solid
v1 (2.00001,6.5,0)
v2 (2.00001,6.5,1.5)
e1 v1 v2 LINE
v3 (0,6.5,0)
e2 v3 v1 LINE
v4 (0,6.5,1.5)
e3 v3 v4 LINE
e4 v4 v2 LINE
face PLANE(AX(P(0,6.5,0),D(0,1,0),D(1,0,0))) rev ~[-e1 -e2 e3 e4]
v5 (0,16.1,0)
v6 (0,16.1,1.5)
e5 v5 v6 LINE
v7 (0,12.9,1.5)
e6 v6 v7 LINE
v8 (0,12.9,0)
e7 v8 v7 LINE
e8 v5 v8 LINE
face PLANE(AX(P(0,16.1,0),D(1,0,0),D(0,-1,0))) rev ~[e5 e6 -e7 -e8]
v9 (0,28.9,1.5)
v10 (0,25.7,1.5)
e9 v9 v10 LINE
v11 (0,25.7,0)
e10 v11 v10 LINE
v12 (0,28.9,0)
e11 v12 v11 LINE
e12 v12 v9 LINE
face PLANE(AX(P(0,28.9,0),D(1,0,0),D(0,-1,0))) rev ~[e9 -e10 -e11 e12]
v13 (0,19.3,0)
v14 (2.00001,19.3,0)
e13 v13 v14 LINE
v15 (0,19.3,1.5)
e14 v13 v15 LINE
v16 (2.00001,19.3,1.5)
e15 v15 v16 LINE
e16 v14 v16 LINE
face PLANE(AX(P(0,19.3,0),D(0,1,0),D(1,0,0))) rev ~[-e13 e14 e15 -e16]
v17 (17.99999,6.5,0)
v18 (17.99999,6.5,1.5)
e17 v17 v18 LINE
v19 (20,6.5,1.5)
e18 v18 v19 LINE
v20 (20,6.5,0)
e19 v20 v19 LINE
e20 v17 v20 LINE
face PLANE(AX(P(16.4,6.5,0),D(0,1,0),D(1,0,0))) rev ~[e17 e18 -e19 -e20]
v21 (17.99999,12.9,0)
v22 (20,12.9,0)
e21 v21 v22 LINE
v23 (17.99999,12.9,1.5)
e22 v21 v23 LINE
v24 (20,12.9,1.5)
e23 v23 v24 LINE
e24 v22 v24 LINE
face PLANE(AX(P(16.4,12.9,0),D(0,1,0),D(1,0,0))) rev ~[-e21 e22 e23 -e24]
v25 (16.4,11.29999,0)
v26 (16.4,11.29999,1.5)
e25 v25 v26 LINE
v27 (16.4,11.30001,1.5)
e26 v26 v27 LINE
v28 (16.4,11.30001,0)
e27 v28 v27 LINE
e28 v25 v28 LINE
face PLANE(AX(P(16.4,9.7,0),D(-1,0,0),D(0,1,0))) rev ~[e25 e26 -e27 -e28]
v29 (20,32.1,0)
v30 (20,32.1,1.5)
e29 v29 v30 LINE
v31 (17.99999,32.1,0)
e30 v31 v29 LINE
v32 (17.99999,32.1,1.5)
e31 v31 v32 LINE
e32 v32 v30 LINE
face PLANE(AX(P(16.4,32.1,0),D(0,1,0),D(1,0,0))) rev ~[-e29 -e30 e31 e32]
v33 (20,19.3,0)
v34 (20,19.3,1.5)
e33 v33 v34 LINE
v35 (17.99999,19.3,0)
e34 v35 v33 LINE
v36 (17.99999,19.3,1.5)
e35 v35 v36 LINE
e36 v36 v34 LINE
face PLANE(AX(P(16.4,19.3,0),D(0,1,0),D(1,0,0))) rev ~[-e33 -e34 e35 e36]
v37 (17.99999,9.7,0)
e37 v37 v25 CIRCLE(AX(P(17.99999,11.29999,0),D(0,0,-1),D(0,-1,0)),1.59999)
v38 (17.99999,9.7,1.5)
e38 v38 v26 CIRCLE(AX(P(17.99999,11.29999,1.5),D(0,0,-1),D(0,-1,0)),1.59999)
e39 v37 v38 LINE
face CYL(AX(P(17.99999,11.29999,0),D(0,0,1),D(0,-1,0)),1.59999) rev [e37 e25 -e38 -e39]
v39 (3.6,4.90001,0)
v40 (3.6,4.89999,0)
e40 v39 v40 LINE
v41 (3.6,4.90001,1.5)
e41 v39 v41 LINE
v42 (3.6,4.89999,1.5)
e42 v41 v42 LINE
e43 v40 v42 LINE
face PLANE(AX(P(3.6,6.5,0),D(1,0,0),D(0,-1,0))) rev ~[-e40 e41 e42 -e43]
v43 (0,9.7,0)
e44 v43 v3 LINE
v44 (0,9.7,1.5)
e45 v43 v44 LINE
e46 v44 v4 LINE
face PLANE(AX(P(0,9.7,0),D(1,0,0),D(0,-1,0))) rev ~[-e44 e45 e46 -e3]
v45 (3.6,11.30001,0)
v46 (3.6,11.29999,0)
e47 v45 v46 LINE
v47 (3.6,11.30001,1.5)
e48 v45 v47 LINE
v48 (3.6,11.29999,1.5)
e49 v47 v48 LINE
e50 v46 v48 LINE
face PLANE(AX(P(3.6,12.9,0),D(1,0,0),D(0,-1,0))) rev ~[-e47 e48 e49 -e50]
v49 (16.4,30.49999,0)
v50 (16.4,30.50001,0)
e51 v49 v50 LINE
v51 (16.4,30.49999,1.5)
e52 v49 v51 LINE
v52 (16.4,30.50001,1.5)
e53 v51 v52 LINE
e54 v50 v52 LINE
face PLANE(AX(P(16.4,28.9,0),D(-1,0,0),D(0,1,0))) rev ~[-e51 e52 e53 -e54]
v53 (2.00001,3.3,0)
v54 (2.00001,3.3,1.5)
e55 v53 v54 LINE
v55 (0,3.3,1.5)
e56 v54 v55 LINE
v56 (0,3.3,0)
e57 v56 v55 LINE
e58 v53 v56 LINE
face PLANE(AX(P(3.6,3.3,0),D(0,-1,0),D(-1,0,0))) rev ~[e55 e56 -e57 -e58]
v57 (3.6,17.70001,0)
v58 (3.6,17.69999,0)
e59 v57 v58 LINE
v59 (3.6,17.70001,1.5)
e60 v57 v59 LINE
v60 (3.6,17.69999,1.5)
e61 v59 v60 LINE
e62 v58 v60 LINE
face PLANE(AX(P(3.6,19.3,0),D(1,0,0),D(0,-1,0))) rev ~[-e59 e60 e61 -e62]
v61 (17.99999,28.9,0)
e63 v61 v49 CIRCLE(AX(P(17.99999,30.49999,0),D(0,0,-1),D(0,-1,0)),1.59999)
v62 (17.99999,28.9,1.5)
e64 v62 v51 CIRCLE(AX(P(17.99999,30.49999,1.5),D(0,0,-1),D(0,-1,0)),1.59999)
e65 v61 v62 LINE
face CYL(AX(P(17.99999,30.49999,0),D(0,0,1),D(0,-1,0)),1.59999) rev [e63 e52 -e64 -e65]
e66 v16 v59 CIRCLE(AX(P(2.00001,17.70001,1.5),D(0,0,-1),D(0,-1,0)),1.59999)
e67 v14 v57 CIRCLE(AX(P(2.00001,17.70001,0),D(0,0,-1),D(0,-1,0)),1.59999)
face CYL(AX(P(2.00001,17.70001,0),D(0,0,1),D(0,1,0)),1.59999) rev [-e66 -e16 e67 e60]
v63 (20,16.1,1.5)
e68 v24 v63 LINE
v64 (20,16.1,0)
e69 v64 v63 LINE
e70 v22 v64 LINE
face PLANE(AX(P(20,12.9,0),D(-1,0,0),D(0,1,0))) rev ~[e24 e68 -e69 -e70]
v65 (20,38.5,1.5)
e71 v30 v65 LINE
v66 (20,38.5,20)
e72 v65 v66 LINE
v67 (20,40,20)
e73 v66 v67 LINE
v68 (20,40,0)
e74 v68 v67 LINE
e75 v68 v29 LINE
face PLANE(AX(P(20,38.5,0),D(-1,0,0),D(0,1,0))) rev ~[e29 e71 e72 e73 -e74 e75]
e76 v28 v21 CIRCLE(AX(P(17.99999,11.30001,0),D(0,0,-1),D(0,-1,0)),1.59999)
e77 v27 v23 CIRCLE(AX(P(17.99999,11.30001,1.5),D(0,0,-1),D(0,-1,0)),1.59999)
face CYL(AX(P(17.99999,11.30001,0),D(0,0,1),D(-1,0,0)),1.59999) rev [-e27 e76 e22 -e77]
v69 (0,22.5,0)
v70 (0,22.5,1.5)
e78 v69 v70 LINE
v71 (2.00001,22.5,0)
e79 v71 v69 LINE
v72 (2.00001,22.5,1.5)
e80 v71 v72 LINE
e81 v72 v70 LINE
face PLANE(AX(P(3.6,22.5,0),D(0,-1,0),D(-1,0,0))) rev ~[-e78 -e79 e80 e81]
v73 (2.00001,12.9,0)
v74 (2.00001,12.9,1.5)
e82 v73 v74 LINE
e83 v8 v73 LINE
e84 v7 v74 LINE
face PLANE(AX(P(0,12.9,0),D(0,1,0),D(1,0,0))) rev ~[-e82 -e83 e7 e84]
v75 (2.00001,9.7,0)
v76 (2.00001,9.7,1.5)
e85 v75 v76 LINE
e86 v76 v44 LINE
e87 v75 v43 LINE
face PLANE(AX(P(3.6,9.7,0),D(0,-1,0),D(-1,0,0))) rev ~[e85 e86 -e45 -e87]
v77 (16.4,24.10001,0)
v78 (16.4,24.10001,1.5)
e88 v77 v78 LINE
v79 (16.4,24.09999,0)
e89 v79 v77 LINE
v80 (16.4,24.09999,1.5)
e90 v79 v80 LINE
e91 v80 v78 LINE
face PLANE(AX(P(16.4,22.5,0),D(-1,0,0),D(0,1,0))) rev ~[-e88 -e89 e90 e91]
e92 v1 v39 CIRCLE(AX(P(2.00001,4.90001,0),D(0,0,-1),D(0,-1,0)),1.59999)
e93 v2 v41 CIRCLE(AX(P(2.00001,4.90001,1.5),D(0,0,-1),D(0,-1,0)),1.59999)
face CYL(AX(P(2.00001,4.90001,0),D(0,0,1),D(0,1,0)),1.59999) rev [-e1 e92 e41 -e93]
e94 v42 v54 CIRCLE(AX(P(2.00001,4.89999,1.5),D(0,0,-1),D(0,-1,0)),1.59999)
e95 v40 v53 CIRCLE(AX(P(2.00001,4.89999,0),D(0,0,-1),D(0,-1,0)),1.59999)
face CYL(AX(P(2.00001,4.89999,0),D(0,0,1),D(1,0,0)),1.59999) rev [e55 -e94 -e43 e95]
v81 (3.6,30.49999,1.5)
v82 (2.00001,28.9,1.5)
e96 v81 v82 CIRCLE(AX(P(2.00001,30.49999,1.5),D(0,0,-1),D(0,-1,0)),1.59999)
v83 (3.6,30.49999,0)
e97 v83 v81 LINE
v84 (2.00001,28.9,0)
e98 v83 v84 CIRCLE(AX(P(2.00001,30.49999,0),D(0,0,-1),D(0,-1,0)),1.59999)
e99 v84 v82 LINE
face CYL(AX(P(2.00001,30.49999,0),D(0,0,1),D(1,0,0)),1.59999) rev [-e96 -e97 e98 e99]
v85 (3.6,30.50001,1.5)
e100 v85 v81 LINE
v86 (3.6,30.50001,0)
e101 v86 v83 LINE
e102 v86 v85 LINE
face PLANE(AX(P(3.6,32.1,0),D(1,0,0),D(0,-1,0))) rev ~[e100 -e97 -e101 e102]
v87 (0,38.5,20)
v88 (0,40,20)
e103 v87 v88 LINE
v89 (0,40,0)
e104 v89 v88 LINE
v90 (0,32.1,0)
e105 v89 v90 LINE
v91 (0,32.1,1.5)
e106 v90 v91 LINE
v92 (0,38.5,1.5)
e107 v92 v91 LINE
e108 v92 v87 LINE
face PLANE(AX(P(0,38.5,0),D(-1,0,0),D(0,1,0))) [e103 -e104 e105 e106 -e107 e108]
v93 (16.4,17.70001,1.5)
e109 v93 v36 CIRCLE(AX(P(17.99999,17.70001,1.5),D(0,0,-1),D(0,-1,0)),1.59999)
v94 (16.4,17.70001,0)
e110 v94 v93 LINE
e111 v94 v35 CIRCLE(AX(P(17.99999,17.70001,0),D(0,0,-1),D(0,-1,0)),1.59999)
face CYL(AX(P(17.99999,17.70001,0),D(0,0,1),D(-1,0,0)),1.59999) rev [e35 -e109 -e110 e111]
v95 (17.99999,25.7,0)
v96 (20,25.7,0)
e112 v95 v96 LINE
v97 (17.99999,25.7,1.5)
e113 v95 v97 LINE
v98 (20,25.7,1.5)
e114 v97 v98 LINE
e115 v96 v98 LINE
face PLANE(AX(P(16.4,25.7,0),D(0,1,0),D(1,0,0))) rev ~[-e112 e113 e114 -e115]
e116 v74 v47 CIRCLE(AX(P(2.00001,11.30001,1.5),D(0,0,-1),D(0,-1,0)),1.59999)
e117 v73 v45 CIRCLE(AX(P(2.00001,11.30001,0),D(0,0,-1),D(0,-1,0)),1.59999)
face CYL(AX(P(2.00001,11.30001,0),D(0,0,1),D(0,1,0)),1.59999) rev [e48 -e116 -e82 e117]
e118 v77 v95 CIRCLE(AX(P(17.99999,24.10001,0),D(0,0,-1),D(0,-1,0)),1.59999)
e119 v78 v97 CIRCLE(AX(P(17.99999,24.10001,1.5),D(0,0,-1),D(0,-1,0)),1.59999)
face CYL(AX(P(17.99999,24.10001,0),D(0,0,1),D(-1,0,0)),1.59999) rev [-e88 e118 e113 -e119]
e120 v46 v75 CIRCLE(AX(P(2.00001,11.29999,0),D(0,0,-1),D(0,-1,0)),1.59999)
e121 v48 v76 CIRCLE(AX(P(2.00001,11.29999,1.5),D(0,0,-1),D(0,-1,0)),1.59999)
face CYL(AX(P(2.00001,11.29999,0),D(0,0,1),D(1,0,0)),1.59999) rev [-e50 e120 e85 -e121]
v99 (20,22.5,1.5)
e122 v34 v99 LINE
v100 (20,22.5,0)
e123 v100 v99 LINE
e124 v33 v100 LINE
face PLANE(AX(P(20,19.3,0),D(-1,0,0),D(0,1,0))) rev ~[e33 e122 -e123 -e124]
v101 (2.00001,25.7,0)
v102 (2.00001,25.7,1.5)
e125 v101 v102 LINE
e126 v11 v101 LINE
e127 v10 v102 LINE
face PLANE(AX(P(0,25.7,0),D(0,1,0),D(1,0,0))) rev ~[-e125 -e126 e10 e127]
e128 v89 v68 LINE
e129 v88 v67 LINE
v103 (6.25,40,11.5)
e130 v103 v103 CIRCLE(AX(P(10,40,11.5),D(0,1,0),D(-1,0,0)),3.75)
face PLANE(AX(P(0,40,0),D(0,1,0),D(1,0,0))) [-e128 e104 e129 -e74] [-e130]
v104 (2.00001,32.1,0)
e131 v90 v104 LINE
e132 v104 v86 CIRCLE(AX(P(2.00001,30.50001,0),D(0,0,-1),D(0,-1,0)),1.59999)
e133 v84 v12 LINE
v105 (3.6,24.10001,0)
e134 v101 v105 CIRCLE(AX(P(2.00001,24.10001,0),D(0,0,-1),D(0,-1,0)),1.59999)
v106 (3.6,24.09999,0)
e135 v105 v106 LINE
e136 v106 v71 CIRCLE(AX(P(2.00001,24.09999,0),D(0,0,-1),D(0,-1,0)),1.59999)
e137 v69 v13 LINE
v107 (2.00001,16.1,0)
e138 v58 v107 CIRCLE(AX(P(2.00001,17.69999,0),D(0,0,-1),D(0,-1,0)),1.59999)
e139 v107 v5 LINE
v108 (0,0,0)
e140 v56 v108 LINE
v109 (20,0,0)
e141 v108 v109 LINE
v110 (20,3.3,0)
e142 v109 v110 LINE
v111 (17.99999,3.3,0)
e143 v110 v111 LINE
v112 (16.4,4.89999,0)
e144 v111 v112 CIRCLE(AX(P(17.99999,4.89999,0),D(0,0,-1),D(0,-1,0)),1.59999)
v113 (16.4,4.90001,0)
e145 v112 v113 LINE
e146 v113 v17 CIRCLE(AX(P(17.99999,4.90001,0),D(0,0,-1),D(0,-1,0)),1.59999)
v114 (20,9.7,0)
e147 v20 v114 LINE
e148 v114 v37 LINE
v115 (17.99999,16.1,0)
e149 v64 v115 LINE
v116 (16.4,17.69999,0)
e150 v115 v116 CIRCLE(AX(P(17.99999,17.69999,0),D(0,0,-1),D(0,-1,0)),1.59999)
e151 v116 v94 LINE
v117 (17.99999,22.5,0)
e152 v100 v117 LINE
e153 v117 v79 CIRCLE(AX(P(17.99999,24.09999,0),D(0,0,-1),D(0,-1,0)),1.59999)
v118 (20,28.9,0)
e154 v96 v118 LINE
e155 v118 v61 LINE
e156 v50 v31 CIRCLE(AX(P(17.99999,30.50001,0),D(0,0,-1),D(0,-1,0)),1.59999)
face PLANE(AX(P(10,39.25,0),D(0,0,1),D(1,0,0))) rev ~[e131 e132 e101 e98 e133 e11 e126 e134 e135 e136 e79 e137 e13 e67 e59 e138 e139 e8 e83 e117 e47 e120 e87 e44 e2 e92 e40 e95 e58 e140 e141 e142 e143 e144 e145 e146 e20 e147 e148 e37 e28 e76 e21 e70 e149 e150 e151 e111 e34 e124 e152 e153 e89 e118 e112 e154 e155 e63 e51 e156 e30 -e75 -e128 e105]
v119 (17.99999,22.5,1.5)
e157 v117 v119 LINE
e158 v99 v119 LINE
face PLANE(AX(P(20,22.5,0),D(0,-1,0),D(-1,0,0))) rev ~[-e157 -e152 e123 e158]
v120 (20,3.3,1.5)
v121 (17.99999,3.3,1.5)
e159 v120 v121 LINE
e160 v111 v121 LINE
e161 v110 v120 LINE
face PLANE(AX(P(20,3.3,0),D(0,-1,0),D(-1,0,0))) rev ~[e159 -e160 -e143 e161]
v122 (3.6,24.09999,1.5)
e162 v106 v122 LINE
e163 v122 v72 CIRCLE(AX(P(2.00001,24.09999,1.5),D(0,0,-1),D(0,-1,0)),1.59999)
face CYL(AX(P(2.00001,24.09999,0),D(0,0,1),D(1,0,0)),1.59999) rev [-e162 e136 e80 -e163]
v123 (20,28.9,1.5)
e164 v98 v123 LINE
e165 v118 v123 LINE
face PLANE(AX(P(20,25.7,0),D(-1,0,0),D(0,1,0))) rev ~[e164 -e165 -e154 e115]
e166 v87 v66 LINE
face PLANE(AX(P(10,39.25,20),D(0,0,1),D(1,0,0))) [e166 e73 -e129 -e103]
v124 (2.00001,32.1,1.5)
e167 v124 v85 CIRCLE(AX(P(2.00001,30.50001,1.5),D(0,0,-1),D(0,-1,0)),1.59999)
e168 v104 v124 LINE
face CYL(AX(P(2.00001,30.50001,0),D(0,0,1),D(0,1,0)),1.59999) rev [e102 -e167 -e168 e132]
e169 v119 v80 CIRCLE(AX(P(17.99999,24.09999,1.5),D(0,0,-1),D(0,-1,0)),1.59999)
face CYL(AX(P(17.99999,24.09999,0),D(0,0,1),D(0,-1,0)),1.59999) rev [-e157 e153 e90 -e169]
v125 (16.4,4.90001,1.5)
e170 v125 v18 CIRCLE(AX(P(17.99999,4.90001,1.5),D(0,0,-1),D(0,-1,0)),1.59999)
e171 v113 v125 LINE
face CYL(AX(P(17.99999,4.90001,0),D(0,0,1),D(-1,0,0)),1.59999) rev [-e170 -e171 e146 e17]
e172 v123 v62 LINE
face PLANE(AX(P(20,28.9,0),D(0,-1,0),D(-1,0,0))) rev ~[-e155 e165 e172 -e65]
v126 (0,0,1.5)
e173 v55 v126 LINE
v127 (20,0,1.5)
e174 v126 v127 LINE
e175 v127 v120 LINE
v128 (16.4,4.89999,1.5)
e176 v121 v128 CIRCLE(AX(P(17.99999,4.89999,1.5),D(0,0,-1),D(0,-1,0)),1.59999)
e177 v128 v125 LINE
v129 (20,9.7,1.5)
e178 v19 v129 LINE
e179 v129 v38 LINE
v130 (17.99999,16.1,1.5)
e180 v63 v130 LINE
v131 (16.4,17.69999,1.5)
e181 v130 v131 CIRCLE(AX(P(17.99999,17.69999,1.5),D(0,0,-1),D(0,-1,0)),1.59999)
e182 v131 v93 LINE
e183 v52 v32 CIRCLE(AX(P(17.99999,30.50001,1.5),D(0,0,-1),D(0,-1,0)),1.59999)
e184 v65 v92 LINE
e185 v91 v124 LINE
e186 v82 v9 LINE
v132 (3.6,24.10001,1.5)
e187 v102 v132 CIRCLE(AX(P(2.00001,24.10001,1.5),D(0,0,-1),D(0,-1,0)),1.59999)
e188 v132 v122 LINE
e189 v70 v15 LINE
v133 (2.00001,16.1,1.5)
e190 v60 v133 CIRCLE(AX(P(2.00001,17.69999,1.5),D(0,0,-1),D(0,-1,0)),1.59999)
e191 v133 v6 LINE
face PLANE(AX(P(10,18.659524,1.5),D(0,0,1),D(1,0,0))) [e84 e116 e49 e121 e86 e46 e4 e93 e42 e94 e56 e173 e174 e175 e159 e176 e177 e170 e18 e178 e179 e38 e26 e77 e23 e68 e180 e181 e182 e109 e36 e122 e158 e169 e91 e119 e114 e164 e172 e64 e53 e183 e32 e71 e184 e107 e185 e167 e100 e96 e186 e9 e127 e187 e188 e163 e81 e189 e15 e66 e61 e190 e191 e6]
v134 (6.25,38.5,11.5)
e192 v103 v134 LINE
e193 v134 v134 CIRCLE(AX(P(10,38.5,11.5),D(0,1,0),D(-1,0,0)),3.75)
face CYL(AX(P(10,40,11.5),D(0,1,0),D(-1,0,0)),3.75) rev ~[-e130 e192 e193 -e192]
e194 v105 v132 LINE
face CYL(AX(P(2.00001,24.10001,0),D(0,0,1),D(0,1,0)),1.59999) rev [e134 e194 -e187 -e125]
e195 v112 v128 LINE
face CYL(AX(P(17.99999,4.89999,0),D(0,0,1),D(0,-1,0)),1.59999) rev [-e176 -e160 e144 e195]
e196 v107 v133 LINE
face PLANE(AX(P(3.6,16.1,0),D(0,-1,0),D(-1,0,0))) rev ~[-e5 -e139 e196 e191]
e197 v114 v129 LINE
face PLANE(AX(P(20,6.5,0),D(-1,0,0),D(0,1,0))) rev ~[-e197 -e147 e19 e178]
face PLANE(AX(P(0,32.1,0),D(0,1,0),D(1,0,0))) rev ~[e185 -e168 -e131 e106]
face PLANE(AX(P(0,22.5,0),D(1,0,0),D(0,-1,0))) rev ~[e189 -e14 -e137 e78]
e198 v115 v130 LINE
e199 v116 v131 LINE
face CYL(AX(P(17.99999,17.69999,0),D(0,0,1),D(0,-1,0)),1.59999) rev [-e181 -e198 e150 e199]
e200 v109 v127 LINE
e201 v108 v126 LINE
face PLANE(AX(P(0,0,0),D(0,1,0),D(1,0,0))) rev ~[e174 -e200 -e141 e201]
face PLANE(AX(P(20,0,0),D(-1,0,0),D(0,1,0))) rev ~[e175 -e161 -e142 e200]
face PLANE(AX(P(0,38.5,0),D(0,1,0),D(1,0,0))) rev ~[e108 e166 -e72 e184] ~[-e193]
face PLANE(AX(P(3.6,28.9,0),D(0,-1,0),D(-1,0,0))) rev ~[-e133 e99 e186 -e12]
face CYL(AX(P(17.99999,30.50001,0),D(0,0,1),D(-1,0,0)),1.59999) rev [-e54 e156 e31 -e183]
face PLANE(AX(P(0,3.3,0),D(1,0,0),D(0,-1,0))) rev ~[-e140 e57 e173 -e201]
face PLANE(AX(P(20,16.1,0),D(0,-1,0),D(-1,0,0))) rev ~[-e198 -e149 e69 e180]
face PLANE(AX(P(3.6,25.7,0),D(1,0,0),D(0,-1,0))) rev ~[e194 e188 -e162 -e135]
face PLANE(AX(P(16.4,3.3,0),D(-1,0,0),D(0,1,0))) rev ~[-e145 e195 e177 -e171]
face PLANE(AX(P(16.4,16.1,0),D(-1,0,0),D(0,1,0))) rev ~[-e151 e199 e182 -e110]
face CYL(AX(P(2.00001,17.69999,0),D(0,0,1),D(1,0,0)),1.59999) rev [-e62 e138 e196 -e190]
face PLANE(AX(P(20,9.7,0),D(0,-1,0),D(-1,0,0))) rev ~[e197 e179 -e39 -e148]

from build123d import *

# Parameters (mm, degrees)
F1_DEPTH = 1.5
F0_W     = 20
F0_H     = 1.5
F2_DEPTH = 20
F3_R     = 3.75
F4_DEPTH = 25
F5_R     = 1.59999


# Not quite as in the source:
# - a fillet or chamfer is up to 0.001 mm smaller than in the source, because OpenCascade refuses the exact size


with BuildPart() as f1:
    # F0 (on Top) → F1 (new body)
    with BuildSketch(Plane.XY):
        Polygon((0, 3.3), (0, 0), (20, 0), (20, 3.3), (16.4, 3.3), (16.4, 6.5), (20, 6.5), (20, 9.7), (16.4, 9.7), (16.4, 12.9), (20, 12.9), (20, 16.1), (16.4, 16.1), (16.4, 19.3), (20, 19.3), (20, 22.5), (16.4, 22.5), (16.4, 25.7), (20, 25.7), (20, 28.9), (16.4, 28.9), (16.4, 32.1), (20, 32.1), (20, 38.5), (0, 38.5), (0, 32.1), (3.6, 32.1), (3.6, 28.9), (0, 28.9), (0, 25.7), (3.6, 25.7), (3.6, 22.5), (0, 22.5), (0, 19.3), (3.6, 19.3), (3.6, 16.1), (0, 16.1), (0, 12.9), (3.6, 12.9), (3.6, 9.7), (0, 9.7), (0, 6.5), (3.6, 6.5), (3.6, 3.3), align=None)
    extrude(amount=F1_DEPTH)

    # F0 (on Top) → F2 (join)
    with BuildSketch(Plane.XY):
        with Locations((10, 39.25)):
            Rectangle(F0_W, F0_H)
    extrude(amount=F2_DEPTH)

    # F3 (on face) → F4 (cut)
    with BuildSketch(Plane(origin=(0, 40, 0), x_dir=(-1, 0, 0), z_dir=(0, 1, 0))):
        with Locations((-10, 11.5)):
            Circle(F3_R)
    extrude(amount=-F4_DEPTH, mode=Mode.SUBTRACT)

    # F5 (radius 1.6 in the source; OpenCascade refuses exactly that, so slightly less here)
    f5_edges = [f1.edges().sort_by_distance(p)[0] for p in [
        (16.4, 32.1, 0.75),
        (16.4, 28.9, 0.75),
        (16.4, 25.7, 0.75),
        (16.4, 22.5, 0.75),
        (16.4, 16.1, 0.75),
        (16.4, 9.7, 0.75),
        (16.4, 3.3, 0.75),
        (16.4, 19.3, 0.75),
        (16.4, 12.9, 0.75),
        (16.4, 6.5, 0.75),
        (3.6, 32.1, 0.75),
        (3.6, 25.7, 0.75),
        (3.6, 19.3, 0.75),
        (3.6, 12.9, 0.75),
        (3.6, 6.5, 0.75),
        (3.6, 28.9, 0.75),
        (3.6, 22.5, 0.75),
        (3.6, 16.1, 0.75),
        (3.6, 9.7, 0.75),
        (3.6, 3.3, 0.75),
    ]]
    fillet(f5_edges, radius=F5_R)


solid = f1.part
